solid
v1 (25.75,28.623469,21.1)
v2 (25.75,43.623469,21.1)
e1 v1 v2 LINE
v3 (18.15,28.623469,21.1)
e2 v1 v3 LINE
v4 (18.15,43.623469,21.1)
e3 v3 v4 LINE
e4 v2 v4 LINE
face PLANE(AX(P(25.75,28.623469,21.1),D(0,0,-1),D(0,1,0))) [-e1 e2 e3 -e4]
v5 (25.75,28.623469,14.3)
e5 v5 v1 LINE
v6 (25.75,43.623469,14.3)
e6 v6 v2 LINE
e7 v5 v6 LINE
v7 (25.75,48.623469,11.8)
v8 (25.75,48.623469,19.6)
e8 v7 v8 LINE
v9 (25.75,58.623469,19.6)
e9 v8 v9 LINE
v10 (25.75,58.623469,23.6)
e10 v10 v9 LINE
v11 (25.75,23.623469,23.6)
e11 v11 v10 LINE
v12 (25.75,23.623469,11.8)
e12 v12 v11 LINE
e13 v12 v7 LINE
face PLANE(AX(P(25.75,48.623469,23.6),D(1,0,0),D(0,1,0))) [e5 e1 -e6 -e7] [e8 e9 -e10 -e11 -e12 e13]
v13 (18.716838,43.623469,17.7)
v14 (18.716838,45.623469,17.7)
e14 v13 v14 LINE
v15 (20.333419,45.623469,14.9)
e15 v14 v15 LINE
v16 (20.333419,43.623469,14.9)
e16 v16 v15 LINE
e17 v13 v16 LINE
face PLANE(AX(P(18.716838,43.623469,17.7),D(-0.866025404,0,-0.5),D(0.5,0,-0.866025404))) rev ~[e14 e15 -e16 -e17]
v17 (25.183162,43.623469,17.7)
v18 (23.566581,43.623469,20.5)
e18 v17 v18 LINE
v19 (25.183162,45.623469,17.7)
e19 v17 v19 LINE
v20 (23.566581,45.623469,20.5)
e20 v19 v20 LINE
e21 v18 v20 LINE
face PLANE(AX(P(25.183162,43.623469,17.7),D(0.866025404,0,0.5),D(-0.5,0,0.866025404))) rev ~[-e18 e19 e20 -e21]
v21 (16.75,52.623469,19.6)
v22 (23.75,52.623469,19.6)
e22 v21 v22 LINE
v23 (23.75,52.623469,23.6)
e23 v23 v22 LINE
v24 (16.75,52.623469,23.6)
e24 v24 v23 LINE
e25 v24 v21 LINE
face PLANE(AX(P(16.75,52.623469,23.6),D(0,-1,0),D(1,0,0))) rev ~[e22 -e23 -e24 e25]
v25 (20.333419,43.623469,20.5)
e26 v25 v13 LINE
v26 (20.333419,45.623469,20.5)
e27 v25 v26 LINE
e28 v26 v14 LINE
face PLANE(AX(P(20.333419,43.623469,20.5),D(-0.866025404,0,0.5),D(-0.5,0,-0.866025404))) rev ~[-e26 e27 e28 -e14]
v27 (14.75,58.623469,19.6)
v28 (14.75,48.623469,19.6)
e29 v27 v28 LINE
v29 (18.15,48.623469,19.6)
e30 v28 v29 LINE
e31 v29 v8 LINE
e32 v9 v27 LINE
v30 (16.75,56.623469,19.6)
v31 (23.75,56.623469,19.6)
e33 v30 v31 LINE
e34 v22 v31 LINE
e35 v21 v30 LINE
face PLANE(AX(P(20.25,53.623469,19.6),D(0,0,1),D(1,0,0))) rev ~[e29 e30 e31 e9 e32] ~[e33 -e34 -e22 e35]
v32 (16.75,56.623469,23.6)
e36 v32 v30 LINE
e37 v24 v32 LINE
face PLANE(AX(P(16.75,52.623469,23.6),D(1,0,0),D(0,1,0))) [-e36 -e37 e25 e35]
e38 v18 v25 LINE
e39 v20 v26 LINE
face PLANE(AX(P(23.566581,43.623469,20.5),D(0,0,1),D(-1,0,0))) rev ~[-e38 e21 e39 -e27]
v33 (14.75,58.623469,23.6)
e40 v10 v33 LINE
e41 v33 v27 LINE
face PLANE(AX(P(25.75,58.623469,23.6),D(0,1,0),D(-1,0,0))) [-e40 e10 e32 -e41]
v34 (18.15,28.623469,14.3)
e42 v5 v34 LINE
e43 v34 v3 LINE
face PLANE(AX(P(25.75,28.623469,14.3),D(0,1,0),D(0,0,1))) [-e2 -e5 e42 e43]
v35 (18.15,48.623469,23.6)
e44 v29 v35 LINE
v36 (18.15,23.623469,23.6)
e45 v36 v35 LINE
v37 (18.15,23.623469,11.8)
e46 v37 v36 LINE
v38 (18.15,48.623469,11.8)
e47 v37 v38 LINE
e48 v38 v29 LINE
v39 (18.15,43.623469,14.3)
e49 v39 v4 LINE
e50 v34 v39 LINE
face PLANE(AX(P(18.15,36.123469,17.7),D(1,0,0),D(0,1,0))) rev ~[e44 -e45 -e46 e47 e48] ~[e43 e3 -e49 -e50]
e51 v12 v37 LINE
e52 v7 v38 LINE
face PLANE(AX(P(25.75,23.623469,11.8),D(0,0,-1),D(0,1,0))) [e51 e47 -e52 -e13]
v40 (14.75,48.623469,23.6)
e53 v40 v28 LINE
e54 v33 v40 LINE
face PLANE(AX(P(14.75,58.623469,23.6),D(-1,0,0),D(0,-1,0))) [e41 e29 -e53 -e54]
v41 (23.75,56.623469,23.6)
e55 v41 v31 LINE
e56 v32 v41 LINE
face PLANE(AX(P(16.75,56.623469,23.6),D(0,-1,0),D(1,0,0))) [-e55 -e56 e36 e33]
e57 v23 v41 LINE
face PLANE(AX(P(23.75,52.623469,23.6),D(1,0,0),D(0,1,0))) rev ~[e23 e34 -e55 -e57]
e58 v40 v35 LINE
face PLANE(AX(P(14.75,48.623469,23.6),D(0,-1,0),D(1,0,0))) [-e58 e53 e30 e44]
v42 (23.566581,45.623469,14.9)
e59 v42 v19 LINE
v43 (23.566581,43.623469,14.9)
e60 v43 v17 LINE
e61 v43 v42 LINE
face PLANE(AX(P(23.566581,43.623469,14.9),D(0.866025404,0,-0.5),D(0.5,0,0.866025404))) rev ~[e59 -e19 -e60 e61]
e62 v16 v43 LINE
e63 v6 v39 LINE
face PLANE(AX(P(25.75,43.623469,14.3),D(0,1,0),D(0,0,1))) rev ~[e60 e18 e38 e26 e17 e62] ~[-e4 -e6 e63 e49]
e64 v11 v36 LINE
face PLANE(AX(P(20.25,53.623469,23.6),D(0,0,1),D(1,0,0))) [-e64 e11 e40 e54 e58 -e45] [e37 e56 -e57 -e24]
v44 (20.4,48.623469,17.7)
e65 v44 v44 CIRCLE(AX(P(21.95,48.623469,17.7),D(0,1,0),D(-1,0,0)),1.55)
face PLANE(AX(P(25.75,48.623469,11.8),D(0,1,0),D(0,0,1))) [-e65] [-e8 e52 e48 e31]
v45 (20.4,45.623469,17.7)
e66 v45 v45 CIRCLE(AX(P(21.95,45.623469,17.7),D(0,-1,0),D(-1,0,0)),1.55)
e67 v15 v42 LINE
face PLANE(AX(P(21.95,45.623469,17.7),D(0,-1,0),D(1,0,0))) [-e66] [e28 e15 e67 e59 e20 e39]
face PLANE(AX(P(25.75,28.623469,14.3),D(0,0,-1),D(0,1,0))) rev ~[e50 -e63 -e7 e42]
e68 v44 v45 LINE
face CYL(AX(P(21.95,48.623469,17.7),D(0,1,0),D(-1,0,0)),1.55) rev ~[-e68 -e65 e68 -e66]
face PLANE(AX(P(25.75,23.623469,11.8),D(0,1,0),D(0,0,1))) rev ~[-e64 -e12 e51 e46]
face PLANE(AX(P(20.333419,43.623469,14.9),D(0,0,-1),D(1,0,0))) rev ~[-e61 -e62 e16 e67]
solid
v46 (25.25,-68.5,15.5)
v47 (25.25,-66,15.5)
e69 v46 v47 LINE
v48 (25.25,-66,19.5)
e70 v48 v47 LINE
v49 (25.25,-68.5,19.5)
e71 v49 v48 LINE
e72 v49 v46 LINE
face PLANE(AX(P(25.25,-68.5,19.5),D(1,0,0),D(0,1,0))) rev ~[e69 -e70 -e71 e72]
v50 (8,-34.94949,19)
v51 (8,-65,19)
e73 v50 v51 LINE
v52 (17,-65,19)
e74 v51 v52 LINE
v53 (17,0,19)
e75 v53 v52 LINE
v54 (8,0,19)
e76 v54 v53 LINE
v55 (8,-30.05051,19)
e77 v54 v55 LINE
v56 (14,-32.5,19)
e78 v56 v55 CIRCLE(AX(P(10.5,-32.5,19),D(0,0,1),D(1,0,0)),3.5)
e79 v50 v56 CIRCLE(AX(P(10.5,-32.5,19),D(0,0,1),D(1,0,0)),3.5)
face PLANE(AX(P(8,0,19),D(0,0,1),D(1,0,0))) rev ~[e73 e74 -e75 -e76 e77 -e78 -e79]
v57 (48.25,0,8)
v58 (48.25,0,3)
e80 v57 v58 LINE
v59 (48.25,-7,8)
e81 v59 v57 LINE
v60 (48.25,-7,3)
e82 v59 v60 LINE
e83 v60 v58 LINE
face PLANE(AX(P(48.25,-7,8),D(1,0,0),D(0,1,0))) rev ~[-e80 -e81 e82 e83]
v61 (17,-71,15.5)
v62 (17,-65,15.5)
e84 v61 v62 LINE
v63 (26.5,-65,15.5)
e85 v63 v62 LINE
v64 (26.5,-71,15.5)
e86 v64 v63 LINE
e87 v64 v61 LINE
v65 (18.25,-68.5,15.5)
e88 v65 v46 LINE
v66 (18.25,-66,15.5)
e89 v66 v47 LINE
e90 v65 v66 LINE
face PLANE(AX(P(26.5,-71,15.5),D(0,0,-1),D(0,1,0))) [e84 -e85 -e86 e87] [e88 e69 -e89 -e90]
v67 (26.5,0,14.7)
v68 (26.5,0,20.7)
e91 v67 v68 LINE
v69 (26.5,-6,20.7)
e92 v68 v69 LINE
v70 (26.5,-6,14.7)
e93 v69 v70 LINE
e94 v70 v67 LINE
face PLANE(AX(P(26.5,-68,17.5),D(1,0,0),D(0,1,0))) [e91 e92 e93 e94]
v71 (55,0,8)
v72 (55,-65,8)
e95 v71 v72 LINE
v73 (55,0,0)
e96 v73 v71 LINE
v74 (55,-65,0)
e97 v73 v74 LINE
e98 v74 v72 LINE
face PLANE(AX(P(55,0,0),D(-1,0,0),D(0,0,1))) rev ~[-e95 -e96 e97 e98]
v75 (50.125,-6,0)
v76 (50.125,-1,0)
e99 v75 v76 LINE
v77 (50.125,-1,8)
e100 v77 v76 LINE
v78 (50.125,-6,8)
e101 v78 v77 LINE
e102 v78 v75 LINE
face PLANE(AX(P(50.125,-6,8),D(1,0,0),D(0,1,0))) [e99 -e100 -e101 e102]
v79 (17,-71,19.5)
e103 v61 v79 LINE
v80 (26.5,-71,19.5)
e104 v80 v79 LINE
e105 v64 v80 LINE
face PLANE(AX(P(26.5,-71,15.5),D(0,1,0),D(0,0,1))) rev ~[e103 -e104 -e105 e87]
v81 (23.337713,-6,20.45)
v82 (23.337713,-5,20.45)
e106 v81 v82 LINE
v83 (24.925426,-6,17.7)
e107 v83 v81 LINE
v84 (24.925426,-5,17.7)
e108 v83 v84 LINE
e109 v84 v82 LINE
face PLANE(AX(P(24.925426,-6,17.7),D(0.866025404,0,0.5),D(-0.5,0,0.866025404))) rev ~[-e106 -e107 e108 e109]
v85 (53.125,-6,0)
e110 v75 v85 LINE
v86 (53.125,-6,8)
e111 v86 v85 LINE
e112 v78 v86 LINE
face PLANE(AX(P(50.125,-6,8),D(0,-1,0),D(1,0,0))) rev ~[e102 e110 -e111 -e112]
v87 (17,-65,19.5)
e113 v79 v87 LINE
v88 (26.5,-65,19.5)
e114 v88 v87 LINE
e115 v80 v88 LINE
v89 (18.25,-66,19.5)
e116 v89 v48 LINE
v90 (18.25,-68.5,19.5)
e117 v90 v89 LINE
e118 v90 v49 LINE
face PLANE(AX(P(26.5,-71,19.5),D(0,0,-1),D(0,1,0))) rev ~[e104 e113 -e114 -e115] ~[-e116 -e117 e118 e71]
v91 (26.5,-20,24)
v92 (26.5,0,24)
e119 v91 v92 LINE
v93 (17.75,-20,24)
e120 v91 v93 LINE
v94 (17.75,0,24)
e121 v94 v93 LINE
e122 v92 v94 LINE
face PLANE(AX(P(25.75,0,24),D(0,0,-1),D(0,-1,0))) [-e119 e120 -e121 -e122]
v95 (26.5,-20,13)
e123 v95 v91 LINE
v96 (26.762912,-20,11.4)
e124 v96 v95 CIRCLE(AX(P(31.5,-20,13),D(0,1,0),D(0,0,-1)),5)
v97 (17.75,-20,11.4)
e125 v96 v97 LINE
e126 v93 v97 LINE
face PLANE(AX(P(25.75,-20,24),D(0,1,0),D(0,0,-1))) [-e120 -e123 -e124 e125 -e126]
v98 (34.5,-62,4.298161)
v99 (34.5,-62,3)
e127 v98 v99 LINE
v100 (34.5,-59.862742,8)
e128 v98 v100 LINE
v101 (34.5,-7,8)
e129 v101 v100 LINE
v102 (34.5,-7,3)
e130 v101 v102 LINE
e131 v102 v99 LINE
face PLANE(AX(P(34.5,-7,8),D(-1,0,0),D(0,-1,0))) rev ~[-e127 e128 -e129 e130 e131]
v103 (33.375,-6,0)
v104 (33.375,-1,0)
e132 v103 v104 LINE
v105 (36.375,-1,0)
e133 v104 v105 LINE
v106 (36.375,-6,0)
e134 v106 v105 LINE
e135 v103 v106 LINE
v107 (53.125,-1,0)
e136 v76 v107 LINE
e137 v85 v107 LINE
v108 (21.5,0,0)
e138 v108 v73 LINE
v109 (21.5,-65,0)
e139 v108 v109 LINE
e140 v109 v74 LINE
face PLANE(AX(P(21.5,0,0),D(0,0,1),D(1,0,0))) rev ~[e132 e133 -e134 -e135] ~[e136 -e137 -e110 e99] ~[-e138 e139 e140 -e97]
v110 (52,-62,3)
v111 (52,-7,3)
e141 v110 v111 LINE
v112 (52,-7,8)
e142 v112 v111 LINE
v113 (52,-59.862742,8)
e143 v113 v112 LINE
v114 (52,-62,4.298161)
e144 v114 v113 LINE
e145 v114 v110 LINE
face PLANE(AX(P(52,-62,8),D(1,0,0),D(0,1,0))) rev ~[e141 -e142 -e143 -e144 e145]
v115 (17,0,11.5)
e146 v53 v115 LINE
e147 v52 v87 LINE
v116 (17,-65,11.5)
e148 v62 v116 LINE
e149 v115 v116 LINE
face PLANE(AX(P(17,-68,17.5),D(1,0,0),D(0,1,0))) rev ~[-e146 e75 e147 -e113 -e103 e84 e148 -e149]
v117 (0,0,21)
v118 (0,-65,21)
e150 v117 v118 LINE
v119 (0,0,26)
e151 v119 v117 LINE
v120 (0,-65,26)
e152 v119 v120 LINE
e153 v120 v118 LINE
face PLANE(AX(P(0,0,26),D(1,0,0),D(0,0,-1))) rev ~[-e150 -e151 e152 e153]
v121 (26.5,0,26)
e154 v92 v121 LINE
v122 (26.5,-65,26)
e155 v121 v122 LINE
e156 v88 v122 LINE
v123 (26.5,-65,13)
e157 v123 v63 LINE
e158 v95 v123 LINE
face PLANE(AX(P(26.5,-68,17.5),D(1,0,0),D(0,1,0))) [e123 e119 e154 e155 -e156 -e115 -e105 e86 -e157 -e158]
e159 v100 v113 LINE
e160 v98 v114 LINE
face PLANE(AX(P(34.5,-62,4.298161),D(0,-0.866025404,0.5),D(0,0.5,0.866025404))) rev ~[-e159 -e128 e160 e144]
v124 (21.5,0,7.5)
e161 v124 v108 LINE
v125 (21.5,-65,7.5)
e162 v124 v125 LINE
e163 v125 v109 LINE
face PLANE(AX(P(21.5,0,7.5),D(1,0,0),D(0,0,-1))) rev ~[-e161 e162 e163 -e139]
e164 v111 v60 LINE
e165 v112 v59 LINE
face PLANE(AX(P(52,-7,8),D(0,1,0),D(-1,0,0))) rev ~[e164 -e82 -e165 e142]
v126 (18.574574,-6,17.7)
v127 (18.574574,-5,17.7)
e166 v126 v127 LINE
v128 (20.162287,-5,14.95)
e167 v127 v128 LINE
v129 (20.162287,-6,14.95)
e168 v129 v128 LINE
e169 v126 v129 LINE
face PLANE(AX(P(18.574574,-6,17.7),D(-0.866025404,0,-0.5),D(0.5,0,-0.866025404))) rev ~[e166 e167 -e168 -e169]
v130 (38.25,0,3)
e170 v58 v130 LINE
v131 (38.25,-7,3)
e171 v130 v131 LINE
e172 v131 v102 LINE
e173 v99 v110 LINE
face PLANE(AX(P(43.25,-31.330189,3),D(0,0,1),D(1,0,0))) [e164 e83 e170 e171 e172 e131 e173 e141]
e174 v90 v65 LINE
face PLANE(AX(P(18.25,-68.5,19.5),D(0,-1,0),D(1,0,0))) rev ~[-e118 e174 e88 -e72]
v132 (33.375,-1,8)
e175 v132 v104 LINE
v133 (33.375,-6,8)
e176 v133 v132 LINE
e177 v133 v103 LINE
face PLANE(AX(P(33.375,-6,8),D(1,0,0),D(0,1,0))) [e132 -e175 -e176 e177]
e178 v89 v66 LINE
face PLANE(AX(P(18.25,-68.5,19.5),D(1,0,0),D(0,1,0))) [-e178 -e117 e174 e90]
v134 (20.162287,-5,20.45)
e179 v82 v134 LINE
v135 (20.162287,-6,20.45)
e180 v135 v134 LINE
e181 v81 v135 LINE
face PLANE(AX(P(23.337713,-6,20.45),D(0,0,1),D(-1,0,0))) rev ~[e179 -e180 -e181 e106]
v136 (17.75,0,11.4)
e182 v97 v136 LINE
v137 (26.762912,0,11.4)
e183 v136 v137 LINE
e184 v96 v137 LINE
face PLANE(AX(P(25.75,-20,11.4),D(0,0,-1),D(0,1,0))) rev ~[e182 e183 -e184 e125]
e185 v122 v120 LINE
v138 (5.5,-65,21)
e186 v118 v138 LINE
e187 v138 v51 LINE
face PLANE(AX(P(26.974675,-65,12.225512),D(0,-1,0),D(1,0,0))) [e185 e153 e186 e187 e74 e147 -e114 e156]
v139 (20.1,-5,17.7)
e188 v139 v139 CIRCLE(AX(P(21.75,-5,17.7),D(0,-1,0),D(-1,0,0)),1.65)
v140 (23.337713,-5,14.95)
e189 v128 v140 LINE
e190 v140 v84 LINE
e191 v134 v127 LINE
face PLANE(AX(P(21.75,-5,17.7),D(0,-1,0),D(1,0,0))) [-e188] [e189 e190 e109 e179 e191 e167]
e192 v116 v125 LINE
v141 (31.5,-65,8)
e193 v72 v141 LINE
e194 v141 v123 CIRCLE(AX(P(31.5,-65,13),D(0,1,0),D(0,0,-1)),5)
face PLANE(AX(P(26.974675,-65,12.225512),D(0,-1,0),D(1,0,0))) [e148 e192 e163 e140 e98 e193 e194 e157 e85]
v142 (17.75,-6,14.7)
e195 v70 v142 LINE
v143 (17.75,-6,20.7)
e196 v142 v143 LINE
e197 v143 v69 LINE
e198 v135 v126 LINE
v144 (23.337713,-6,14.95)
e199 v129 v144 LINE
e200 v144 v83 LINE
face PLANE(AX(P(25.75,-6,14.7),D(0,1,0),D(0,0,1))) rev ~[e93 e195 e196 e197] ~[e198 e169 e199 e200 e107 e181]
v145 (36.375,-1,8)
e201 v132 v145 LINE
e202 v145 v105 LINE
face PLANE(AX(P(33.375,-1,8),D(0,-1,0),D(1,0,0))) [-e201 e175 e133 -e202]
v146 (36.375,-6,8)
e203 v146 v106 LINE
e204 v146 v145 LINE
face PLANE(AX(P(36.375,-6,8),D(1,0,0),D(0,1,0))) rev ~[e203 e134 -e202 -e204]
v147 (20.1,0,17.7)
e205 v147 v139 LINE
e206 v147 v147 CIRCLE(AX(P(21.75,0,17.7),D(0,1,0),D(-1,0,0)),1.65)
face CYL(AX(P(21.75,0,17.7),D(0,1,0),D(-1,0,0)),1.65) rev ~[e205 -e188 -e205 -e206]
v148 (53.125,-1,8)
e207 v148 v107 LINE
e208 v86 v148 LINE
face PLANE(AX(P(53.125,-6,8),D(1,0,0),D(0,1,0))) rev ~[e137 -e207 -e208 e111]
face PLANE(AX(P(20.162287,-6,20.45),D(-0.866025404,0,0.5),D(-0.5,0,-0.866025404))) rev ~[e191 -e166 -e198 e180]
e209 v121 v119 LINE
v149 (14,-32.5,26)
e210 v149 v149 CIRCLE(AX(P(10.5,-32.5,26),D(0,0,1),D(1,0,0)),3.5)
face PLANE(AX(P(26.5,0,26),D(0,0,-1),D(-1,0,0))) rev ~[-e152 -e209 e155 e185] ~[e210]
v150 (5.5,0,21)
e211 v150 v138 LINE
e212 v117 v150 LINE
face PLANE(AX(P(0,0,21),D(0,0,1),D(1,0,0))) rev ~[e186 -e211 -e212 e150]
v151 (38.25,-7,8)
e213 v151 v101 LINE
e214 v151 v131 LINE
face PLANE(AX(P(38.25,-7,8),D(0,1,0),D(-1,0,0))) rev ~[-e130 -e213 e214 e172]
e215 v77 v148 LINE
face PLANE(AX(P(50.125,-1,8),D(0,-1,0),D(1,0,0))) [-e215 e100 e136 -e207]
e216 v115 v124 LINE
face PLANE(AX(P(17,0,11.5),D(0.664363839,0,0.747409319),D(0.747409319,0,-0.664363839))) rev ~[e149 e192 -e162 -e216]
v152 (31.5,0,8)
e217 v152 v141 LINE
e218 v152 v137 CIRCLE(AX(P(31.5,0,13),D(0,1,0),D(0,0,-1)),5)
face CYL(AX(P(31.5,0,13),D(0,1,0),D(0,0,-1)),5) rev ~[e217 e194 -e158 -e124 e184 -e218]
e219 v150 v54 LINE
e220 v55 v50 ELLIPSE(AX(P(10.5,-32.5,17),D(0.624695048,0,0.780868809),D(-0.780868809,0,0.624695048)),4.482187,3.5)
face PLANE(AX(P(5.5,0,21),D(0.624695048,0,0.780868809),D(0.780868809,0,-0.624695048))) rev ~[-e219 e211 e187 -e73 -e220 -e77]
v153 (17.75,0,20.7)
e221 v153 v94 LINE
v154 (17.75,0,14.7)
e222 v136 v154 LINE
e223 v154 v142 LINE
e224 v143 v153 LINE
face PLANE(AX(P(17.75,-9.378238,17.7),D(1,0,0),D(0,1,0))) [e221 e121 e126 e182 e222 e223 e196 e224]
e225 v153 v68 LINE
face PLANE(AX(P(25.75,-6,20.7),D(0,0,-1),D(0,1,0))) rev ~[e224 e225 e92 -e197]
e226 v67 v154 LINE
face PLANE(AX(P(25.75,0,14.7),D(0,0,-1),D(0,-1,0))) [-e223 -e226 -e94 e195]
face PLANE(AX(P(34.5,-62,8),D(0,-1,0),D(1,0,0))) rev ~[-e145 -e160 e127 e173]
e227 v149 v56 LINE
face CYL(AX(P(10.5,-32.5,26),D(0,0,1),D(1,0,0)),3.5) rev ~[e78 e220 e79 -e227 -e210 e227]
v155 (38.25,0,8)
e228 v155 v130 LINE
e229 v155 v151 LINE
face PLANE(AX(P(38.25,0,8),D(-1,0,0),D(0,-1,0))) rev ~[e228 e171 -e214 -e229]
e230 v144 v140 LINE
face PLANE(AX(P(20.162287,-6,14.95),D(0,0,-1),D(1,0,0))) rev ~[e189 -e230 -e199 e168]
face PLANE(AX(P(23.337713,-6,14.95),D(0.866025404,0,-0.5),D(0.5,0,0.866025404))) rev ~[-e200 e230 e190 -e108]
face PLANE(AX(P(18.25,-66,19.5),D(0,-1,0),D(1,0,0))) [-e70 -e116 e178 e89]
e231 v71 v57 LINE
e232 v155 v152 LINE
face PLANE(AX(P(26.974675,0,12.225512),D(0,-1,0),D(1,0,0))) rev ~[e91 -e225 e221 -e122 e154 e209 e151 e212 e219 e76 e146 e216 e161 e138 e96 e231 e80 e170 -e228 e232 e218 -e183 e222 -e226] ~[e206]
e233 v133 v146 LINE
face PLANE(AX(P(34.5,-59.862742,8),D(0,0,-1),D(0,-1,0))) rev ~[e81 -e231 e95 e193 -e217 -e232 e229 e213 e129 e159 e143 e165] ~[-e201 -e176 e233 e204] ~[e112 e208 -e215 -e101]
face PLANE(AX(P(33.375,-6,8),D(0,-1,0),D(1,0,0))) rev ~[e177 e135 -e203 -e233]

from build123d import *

# Parameters (mm, degrees)
F1_DEPTH  = 65
F2_R      = 3.5
F3_DEPTH  = 7
F5_DEPTH  = 5
F7_DEPTH  = 17.5
F9_W      = 6
F9_H      = 4
F10_DEPTH = 9.5
F11_W     = 7
F11_H     = 2.5
F12_DEPTH = 4
F15_DEPTH = 8
F16_R     = 1.65
F17_DEPTH = 6
F18_R     = 1.65
F19_DEPTH = 1
F20_DEPTH = 8
F21_DEPTH = 1.0139122871
F22_W     = 3
F22_H     = 5
F23_DEPTH = 8
F24_W     = 25
F24_H     = 11.8
F24_W_2   = 15
F24_H_2   = 6.8
F25_DEPTH = 7.6
F26_R     = 1.55
F27_DEPTH = 5
F28_R     = 1.55
F29_DEPTH = 2
F30_W     = 7
F30_H     = 4
F31_DEPTH = 4


# Not quite as in the source:
# - a feature names something its author has since deleted; it is built from what else it names


with BuildPart() as f1:
    # F0 (on Front) → F1 (new body)
    with BuildSketch(Plane.XZ):
        with BuildLine():
            Line((0, 26), (0, 21))
            Line((0, 21), (5.5, 21))
            Line((5.5, 21), (8, 19))
            Line((8, 19), (17, 19))
            Line((17, 19), (17, 11.5))
            Line((17, 11.5), (21.5, 7.5))
            Line((21.5, 7.5), (21.5, 0))
            Line((21.5, 0), (55, 0))
            Line((55, 0), (55, 8))
            Line((55, 8), (31.5, 8))
            ThreePointArc((31.5, 8), (27.9644660941, 9.4644660941), (26.5, 13))
            Line((26.5, 13), (26.5, 26))
            Line((26.5, 26), (0, 26))
        make_face()
    extrude(amount=F1_DEPTH)

    # F2 (on face) → F3 (cut, through all)
    with BuildSketch(Plane.XY.offset(26)):
        with Locations((10.5, -32.5)):
            Circle(F2_R)
    extrude(amount=-F3_DEPTH, mode=Mode.SUBTRACT)

    # F4 (on face) → F5 (cut)
    with BuildSketch(Plane.XY.offset(8)):
        Polygon((34.5, -62), (52, -62), (52, -7), (48.25, -7), (48.25, 0), (38.25, 0), (38.25, -7), (34.5, -7), align=None)
    extrude(amount=-F5_DEPTH, mode=Mode.SUBTRACT)

    # F6 (on face) → F7 (join, through all)
    with BuildSketch(Plane.YZ.offset(34.5)):
        Polygon((-62, 8), (-62, 4.2981612496), (-59.862742401, 8), align=None)
    extrude(amount=F7_DEPTH)

    # F9 (on offset) → F10 (join, through all)
    with BuildSketch(Plane.YZ.offset(26.5)):
        with Locations((-68, 17.5)):
            Rectangle(F9_W, F9_H)
    extrude(amount=-F10_DEPTH)

    # F11 (on face) → F12 (cut, through all)
    with BuildSketch(Plane.XY.offset(19.5)):
        with Locations((21.75, -67.25)):
            Rectangle(F11_W, F11_H)
    extrude(amount=-F12_DEPTH, mode=Mode.SUBTRACT)

    # F14 (on offset) → F15 (cut)
    with BuildSketch(Plane.YZ.offset(25.75)):
        Polygon((-20, 11.4), (0, 11.4), (0, 14.7), (-6, 14.7), (-6, 20.7), (0, 20.7), (0, 24), (-20, 24), align=None)
    extrude(amount=-F15_DEPTH, mode=Mode.SUBTRACT)

    # F16 (on face) → F17 (cut, through all)
    with BuildSketch(Plane(origin=(0, 0, 0), x_dir=(-1, 0, 0), z_dir=(0, 1, 0))):
        with Locations((-21.75, 17.7)):
            Circle(F16_R)
    extrude(amount=-F17_DEPTH, mode=Mode.SUBTRACT)

    # F18 (on face) → F19 (cut)
    with BuildSketch(Plane.XZ.offset(6)):
        Polygon((23.3377132403, 14.95), (24.9254264805, 17.7), (23.3377132403, 20.45), (20.1622867597, 20.45), (18.5745735195, 17.7), (20.1622867597, 14.95), align=None)
        with Locations((21.75, 17.7)):
            Circle(F18_R, mode=Mode.SUBTRACT)
    extrude(amount=-F19_DEPTH, mode=Mode.SUBTRACT)

    # F14 (on offset) → F20 (cut, through all)
    with BuildSketch(Plane.YZ.offset(25.75)):
        Polygon((-20, 11.4), (0, 11.4), (0, 14.7), (-6, 14.7), (-6, 20.7), (0, 20.7), (0, 24), (-20, 24), align=None)
    extrude(amount=-F20_DEPTH, mode=Mode.SUBTRACT)

    # F14 (on offset) → F21 (cut, through all)
    with BuildSketch(Plane.YZ.offset(25.75)):
        Polygon((-20, 11.4), (0, 11.4), (0, 14.7), (-6, 14.7), (-6, 20.7), (0, 20.7), (0, 24), (-20, 24), align=None)
    extrude(amount=F21_DEPTH, mode=Mode.SUBTRACT)

    # F22 (on face) → F23 (cut, through all)
    with BuildSketch(Plane.XY.offset(8)):
        with Locations((34.875, -3.5)):
            Rectangle(F22_W, F22_H)
        with Locations((51.625, -3.5)):
            Rectangle(F22_W, F22_H)
    extrude(amount=-F23_DEPTH, mode=Mode.SUBTRACT)


with BuildPart() as f25:
    # F24 (on offset) → F25 (new body)
    with BuildSketch(Plane.YZ.offset(25.75)):
        with Locations((36.1234692893, 17.7)):
            Rectangle(F24_W, F24_H)
        with Locations((36.1234692893, 17.7)):
            Rectangle(F24_W_2, F24_H_2, mode=Mode.SUBTRACT)
    extrude(amount=-F25_DEPTH)

    # F26 (on face) → F27 (cut, through all)
    with BuildSketch(Plane(origin=(0, 48.6234692893, 0), x_dir=(-1, 0, 0), z_dir=(0, 1, 0))):
        with Locations((-21.95, 17.7)):
            Circle(F26_R)
    extrude(amount=-F27_DEPTH, mode=Mode.SUBTRACT)

    # F28 (on face) → F29 (cut)
    with BuildSketch(Plane.XZ.offset(-43.6234692893)):
        Polygon((23.5665807537, 14.9), (25.1831615075, 17.7), (23.5665807537, 20.5), (20.3334192463, 20.5), (18.7168384925, 17.7), (20.3334192463, 14.9), align=None)
        with Locations((21.95, 17.7)):
            Circle(F28_R, mode=Mode.SUBTRACT)
    extrude(amount=-F29_DEPTH, mode=Mode.SUBTRACT)

    # F30 (on face) → F31 (join)
    with BuildSketch(Plane.XY.offset(23.6)):
        Polygon((14.75, 58.6234692893), (14.75, 48.6234692893), (18.15, 48.6234692893), (25.75, 48.6234692893), (25.75, 58.6234692893), align=None)
        with Locations((20.25, 54.6234692893)):
            Rectangle(F30_W, F30_H, mode=Mode.SUBTRACT)
    extrude(amount=-F31_DEPTH)


solid = Compound([f1.part, f25.part])
